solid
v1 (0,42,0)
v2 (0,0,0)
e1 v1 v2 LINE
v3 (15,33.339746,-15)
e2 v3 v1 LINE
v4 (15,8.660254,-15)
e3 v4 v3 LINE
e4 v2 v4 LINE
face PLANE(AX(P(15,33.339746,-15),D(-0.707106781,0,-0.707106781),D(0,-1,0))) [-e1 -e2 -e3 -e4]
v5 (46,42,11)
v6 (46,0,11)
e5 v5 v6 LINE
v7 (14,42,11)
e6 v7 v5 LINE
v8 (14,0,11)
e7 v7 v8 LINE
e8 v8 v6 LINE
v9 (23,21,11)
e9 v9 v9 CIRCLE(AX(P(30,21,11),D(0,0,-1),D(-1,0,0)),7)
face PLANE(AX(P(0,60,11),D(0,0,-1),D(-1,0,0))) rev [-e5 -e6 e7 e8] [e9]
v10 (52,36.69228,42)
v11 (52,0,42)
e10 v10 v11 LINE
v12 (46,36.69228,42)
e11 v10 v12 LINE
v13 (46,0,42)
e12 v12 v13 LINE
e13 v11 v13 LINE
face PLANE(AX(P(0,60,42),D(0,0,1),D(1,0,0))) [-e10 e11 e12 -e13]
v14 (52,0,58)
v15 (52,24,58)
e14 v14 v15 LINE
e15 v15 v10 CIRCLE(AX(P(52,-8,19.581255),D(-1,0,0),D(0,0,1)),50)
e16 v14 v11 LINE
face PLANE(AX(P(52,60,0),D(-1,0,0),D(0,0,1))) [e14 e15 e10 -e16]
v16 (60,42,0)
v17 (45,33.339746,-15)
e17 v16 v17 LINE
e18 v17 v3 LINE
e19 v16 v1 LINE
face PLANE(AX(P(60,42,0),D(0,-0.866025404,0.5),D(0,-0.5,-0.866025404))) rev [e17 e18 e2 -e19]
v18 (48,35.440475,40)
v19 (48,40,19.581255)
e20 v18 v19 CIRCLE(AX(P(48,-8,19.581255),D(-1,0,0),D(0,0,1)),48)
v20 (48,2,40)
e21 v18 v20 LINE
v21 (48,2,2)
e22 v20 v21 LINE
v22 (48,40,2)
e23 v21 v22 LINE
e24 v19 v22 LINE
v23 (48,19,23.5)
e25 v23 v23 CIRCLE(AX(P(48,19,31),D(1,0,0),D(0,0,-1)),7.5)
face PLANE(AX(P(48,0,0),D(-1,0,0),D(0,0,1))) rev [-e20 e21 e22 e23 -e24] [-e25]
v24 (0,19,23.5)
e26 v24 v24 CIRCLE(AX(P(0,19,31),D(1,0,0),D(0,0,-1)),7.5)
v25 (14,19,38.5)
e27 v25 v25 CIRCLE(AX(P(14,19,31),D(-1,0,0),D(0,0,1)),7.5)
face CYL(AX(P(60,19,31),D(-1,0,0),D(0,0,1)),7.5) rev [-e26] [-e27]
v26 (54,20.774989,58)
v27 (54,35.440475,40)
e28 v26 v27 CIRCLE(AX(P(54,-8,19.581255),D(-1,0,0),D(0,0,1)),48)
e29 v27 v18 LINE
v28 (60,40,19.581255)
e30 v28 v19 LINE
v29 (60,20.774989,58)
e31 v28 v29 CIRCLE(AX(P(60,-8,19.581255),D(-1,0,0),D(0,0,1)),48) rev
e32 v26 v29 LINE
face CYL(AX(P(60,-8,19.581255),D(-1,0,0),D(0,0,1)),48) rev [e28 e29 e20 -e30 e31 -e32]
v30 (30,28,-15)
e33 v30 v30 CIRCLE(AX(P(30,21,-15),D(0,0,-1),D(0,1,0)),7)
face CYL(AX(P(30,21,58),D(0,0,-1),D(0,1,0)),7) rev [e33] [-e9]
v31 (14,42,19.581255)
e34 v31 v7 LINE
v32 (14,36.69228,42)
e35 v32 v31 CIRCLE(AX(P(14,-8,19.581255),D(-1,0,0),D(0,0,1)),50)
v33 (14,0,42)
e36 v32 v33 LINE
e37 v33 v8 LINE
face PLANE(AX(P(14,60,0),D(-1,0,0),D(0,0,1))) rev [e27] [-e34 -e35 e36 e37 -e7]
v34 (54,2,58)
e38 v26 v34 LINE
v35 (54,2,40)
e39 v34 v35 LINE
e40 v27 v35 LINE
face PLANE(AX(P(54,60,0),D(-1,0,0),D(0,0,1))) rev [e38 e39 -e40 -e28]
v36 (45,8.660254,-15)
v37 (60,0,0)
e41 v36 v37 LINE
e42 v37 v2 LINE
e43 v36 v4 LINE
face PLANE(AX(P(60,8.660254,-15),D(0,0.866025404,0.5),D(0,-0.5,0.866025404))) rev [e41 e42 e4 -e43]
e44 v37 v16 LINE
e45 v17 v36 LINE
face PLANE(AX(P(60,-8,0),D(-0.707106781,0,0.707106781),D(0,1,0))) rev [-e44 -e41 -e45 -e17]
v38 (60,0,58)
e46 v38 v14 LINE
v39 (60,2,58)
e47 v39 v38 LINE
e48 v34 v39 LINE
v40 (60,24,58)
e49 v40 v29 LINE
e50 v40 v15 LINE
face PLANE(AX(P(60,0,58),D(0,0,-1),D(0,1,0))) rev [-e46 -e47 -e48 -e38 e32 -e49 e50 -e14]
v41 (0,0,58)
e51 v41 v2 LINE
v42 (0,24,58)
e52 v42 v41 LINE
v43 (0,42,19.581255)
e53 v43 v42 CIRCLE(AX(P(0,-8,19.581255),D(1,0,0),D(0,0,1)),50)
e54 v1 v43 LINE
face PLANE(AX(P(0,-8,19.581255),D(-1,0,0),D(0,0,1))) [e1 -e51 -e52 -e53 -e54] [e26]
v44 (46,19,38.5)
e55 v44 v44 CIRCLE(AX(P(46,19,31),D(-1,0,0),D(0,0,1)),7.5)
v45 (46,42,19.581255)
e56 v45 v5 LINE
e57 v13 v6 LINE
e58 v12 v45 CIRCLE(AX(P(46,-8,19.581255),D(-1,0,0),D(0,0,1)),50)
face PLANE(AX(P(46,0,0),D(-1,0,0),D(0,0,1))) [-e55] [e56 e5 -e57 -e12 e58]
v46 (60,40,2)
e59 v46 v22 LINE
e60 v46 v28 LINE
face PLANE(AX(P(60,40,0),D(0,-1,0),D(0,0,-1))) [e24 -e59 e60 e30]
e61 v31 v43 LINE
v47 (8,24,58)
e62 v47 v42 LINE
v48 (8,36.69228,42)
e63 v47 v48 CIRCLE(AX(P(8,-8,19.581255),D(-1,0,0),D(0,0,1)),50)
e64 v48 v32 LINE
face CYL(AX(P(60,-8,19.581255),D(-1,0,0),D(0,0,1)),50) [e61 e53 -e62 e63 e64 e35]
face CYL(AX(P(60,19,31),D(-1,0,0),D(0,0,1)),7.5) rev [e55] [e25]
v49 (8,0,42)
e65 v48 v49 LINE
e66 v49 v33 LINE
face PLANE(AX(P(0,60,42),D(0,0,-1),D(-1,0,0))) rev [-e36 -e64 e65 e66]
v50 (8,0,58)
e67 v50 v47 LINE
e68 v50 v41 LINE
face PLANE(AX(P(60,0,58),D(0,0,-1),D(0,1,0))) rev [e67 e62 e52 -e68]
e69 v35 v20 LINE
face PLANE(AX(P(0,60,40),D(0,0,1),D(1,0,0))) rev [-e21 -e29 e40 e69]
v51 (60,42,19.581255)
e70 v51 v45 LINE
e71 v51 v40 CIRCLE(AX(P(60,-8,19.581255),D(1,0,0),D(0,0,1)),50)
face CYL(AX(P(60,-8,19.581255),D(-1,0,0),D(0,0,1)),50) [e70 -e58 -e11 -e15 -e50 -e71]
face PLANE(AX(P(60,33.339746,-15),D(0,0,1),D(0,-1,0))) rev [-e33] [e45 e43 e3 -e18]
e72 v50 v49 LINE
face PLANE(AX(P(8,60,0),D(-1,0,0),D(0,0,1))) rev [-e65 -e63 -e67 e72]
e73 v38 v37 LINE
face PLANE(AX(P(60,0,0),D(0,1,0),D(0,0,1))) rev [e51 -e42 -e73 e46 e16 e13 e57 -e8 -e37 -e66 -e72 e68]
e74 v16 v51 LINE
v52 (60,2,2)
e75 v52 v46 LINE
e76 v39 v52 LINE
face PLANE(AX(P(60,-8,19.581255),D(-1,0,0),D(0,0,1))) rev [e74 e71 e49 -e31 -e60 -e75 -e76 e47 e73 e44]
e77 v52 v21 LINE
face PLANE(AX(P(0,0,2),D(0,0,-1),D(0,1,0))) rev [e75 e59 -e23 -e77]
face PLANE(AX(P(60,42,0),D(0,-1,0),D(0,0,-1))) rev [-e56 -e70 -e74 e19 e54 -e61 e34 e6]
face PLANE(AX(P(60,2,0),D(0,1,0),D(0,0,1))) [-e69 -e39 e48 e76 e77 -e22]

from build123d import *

# Parameters (mm, degrees)
SKETCH1_R           = 7.5
BOSS_EXTRUDE1_DEPTH = 60
CUT_EXTRUDE2_DEPTH  = 60
SKETCH3_R           = 7
CUT_EXTRUDE3_DEPTH  = 104.406963015
CHAMFER1_SIZE       = 15
SPLIT2_START        = 46
SPLIT2_OUTLINE_R    = 7.5
SPLIT2_DEPTH        = 14
SPLIT2_START_2      = 52
SPLIT2_2_DEPTH      = 8
SPLIT2_3_DEPTH      = 58
SHELL1_START        = 48
SHELL1_DEPTH        = 12
SHELL1_START_2      = 54
SHELL1_2_DEPTH      = 6
CUT_EXTRUDE4_DEPTH  = 12
CUT_EXTRUDE5_DEPTH  = 6
CUT_EXTRUDE6_DEPTH  = 6


# Read off the part's stored shape, not the designer's step: Split2, Shell1
with BuildPart() as part:
    # Sketch1 → Boss-Extrude1 (new body)
    with BuildSketch(Plane(origin=(0, 0, 0), x_dir=(0, 0, -1), z_dir=(1, 0, 0))):
        with BuildLine():
            Line((-58, 0), (-58, 24))
            ThreePointArc((-58, 24), (-40.794458011, 37.276925691), (-19.581254575, 42))
            Line((-19.581254575, 42), (0, 42))
            Line((0, 42), (15, 33.339745962))
            Line((15, 33.339745962), (15, 8.660254038))
            Line((15, 8.660254038), (0, 0))
            Line((0, 0), (-58, 0))
        make_face()
        with Locations((-31, 19)):
            Circle(SKETCH1_R, mode=Mode.SUBTRACT)
    extrude(amount=BOSS_EXTRUDE1_DEPTH)

    # Sketch2 → Cut-Extrude2 (cut)
    with BuildSketch(Plane(origin=(0, 0, 0), x_dir=(1, 0, 0), z_dir=(0, 1, 0))):
        Polygon((8, -58), (30, -58), (30, -11), (14, -11), (14, -42), (8, -42), align=None)
        Polygon((30, -11), (30, -58), (52, -58), (52, -42), (46, -42), (46, -11), align=None)
    extrude(amount=CUT_EXTRUDE2_DEPTH, mode=Mode.SUBTRACT)

    # Sketch3 → Cut-Extrude3 (cut, through all)
    with BuildSketch(Plane(origin=(0, 0, -15), x_dir=(-1, 0, 0), z_dir=(0, 0, -1))):
        with Locations(Location((-30, 21, 0), (0, 0, 90))):
            Circle(SKETCH3_R)
    extrude(amount=-CUT_EXTRUDE3_DEPTH, mode=Mode.SUBTRACT)

    # Chamfer1
    chamfer1_edges = [part.edges().sort_by_distance(p)[0] for p in [
        (0, 21, -15),
        (60, 21, -15),
    ]]
    chamfer(chamfer1_edges, length=CHAMFER1_SIZE)

    # Split2 3 outline → Split2 3 (cut)
    with BuildSketch(Plane.XY):
        Polygon((60, 42), (46, 42), (46, 0), (52, 0), (60, 0), align=None)
    extrude(amount=SPLIT2_3_DEPTH, mode=Mode.SUBTRACT)


with BuildPart() as body_2:
    # Split2 outline → Split2 (new body)
    with BuildSketch(Plane.YZ.offset(SPLIT2_START)):
        with BuildLine():
            Line((0, 42), (0, 0))
            Line((0, 0), (42, 0))
            Line((42, 0), (42, 19.581254575))
            ThreePointArc((42, 19.581254575), (40.654979081, 31.100499804), (36.692279575, 42))
            Line((36.692279575, 42), (0, 42))
        make_face()
        with Locations((19, 31)):
            Circle(SPLIT2_OUTLINE_R, mode=Mode.SUBTRACT)
    extrude(amount=SPLIT2_DEPTH)

    # Split2 2 outline → Split2 2 (add)
    with BuildSketch(Plane.YZ.offset(SPLIT2_START_2)):
        with BuildLine():
            Line((0, 58), (0, 42))
            Line((0, 42), (36.692279575, 42))
            ThreePointArc((36.692279575, 42), (31.171755598, 50.654934168), (24, 58))
            Line((24, 58), (0, 58))
        make_face()
    extrude(amount=SPLIT2_2_DEPTH)

    # Shell1 outline → Shell1 (cut)
    with BuildSketch(Plane.YZ.offset(SHELL1_START)):
        with BuildLine():
            ThreePointArc((40, 19.581254575), (38.846252688, 30.042067598), (35.440474621, 40))
            Line((35.440474621, 40), (22.041381265, 40))
            ThreePointArc((22.041381265, 40), (19, 21.5), (15.958618735, 40))
            Line((15.958618735, 40), (2, 40))
            Line((2, 40), (2, 2))
            Line((2, 2), (40, 2))
            Line((40, 2), (40, 19.581254575))
        make_face()
    extrude(amount=SHELL1_DEPTH, mode=Mode.SUBTRACT)

    # Shell1 2 outline → Shell1 2 (cut)
    with BuildSketch(Plane.YZ.offset(SHELL1_START_2)):
        with BuildLine():
            Line((22.041381265, 40), (35.440474621, 40))
            ThreePointArc((35.440474621, 40), (30.201195976, 48.644437917), (23.267794641, 56))
            Line((23.267794641, 56), (2, 56))
            Line((2, 56), (2, 40))
            Line((2, 40), (15.958618735, 40))
            ThreePointArc((15.958618735, 40), (19, 40.5), (22.041381265, 40))
        make_face()
    extrude(amount=SHELL1_2_DEPTH, mode=Mode.SUBTRACT)

    # Sketch4 → Cut-Extrude4 (cut)
    with BuildSketch(Plane(origin=(48, 0, 0), x_dir=(0, 0, -1), z_dir=(1, 0, 0))):
        with BuildLine():
            Line((-40, 15.958618735), (-40, 22.041381265))
            ThreePointArc((-40, 22.041381265), (-21.5, 19), (-40, 15.958618735))
        make_face()
    extrude(amount=CUT_EXTRUDE4_DEPTH, mode=Mode.SUBTRACT)

    # Sketch5 → Cut-Extrude5 (cut)
    with BuildSketch(Plane(origin=(54, 0, 0), x_dir=(0, 0, -1), z_dir=(1, 0, 0))):
        Polygon((-40, 14.184038534), (-40, 24.39394248), (-43.350764403, 21.043178076), align=None)
    extrude(amount=CUT_EXTRUDE5_DEPTH, mode=Mode.SUBTRACT)

    # Sketch6 → Cut-Extrude6 (cut)
    with BuildSketch(Plane(origin=(60, 0, 0), x_dir=(0, 0, -1), z_dir=(1, 0, 0))):
        with BuildLine():
            ThreePointArc((-56, 23.267794641), (-57.020752822, 22.038042064), (-58, 20.77498914))
            Line((-58, 20.77498914), (-58, 2))
            Line((-58, 2), (-56, 2))
            Line((-56, 2), (-56, 23.267794641))
        make_face()
    extrude(amount=-CUT_EXTRUDE6_DEPTH, mode=Mode.SUBTRACT)


with BuildPart() as part_1:
    add(part.part)

    # Combine1: union body 2
    add(body_2.part)


solid = part_1.part
